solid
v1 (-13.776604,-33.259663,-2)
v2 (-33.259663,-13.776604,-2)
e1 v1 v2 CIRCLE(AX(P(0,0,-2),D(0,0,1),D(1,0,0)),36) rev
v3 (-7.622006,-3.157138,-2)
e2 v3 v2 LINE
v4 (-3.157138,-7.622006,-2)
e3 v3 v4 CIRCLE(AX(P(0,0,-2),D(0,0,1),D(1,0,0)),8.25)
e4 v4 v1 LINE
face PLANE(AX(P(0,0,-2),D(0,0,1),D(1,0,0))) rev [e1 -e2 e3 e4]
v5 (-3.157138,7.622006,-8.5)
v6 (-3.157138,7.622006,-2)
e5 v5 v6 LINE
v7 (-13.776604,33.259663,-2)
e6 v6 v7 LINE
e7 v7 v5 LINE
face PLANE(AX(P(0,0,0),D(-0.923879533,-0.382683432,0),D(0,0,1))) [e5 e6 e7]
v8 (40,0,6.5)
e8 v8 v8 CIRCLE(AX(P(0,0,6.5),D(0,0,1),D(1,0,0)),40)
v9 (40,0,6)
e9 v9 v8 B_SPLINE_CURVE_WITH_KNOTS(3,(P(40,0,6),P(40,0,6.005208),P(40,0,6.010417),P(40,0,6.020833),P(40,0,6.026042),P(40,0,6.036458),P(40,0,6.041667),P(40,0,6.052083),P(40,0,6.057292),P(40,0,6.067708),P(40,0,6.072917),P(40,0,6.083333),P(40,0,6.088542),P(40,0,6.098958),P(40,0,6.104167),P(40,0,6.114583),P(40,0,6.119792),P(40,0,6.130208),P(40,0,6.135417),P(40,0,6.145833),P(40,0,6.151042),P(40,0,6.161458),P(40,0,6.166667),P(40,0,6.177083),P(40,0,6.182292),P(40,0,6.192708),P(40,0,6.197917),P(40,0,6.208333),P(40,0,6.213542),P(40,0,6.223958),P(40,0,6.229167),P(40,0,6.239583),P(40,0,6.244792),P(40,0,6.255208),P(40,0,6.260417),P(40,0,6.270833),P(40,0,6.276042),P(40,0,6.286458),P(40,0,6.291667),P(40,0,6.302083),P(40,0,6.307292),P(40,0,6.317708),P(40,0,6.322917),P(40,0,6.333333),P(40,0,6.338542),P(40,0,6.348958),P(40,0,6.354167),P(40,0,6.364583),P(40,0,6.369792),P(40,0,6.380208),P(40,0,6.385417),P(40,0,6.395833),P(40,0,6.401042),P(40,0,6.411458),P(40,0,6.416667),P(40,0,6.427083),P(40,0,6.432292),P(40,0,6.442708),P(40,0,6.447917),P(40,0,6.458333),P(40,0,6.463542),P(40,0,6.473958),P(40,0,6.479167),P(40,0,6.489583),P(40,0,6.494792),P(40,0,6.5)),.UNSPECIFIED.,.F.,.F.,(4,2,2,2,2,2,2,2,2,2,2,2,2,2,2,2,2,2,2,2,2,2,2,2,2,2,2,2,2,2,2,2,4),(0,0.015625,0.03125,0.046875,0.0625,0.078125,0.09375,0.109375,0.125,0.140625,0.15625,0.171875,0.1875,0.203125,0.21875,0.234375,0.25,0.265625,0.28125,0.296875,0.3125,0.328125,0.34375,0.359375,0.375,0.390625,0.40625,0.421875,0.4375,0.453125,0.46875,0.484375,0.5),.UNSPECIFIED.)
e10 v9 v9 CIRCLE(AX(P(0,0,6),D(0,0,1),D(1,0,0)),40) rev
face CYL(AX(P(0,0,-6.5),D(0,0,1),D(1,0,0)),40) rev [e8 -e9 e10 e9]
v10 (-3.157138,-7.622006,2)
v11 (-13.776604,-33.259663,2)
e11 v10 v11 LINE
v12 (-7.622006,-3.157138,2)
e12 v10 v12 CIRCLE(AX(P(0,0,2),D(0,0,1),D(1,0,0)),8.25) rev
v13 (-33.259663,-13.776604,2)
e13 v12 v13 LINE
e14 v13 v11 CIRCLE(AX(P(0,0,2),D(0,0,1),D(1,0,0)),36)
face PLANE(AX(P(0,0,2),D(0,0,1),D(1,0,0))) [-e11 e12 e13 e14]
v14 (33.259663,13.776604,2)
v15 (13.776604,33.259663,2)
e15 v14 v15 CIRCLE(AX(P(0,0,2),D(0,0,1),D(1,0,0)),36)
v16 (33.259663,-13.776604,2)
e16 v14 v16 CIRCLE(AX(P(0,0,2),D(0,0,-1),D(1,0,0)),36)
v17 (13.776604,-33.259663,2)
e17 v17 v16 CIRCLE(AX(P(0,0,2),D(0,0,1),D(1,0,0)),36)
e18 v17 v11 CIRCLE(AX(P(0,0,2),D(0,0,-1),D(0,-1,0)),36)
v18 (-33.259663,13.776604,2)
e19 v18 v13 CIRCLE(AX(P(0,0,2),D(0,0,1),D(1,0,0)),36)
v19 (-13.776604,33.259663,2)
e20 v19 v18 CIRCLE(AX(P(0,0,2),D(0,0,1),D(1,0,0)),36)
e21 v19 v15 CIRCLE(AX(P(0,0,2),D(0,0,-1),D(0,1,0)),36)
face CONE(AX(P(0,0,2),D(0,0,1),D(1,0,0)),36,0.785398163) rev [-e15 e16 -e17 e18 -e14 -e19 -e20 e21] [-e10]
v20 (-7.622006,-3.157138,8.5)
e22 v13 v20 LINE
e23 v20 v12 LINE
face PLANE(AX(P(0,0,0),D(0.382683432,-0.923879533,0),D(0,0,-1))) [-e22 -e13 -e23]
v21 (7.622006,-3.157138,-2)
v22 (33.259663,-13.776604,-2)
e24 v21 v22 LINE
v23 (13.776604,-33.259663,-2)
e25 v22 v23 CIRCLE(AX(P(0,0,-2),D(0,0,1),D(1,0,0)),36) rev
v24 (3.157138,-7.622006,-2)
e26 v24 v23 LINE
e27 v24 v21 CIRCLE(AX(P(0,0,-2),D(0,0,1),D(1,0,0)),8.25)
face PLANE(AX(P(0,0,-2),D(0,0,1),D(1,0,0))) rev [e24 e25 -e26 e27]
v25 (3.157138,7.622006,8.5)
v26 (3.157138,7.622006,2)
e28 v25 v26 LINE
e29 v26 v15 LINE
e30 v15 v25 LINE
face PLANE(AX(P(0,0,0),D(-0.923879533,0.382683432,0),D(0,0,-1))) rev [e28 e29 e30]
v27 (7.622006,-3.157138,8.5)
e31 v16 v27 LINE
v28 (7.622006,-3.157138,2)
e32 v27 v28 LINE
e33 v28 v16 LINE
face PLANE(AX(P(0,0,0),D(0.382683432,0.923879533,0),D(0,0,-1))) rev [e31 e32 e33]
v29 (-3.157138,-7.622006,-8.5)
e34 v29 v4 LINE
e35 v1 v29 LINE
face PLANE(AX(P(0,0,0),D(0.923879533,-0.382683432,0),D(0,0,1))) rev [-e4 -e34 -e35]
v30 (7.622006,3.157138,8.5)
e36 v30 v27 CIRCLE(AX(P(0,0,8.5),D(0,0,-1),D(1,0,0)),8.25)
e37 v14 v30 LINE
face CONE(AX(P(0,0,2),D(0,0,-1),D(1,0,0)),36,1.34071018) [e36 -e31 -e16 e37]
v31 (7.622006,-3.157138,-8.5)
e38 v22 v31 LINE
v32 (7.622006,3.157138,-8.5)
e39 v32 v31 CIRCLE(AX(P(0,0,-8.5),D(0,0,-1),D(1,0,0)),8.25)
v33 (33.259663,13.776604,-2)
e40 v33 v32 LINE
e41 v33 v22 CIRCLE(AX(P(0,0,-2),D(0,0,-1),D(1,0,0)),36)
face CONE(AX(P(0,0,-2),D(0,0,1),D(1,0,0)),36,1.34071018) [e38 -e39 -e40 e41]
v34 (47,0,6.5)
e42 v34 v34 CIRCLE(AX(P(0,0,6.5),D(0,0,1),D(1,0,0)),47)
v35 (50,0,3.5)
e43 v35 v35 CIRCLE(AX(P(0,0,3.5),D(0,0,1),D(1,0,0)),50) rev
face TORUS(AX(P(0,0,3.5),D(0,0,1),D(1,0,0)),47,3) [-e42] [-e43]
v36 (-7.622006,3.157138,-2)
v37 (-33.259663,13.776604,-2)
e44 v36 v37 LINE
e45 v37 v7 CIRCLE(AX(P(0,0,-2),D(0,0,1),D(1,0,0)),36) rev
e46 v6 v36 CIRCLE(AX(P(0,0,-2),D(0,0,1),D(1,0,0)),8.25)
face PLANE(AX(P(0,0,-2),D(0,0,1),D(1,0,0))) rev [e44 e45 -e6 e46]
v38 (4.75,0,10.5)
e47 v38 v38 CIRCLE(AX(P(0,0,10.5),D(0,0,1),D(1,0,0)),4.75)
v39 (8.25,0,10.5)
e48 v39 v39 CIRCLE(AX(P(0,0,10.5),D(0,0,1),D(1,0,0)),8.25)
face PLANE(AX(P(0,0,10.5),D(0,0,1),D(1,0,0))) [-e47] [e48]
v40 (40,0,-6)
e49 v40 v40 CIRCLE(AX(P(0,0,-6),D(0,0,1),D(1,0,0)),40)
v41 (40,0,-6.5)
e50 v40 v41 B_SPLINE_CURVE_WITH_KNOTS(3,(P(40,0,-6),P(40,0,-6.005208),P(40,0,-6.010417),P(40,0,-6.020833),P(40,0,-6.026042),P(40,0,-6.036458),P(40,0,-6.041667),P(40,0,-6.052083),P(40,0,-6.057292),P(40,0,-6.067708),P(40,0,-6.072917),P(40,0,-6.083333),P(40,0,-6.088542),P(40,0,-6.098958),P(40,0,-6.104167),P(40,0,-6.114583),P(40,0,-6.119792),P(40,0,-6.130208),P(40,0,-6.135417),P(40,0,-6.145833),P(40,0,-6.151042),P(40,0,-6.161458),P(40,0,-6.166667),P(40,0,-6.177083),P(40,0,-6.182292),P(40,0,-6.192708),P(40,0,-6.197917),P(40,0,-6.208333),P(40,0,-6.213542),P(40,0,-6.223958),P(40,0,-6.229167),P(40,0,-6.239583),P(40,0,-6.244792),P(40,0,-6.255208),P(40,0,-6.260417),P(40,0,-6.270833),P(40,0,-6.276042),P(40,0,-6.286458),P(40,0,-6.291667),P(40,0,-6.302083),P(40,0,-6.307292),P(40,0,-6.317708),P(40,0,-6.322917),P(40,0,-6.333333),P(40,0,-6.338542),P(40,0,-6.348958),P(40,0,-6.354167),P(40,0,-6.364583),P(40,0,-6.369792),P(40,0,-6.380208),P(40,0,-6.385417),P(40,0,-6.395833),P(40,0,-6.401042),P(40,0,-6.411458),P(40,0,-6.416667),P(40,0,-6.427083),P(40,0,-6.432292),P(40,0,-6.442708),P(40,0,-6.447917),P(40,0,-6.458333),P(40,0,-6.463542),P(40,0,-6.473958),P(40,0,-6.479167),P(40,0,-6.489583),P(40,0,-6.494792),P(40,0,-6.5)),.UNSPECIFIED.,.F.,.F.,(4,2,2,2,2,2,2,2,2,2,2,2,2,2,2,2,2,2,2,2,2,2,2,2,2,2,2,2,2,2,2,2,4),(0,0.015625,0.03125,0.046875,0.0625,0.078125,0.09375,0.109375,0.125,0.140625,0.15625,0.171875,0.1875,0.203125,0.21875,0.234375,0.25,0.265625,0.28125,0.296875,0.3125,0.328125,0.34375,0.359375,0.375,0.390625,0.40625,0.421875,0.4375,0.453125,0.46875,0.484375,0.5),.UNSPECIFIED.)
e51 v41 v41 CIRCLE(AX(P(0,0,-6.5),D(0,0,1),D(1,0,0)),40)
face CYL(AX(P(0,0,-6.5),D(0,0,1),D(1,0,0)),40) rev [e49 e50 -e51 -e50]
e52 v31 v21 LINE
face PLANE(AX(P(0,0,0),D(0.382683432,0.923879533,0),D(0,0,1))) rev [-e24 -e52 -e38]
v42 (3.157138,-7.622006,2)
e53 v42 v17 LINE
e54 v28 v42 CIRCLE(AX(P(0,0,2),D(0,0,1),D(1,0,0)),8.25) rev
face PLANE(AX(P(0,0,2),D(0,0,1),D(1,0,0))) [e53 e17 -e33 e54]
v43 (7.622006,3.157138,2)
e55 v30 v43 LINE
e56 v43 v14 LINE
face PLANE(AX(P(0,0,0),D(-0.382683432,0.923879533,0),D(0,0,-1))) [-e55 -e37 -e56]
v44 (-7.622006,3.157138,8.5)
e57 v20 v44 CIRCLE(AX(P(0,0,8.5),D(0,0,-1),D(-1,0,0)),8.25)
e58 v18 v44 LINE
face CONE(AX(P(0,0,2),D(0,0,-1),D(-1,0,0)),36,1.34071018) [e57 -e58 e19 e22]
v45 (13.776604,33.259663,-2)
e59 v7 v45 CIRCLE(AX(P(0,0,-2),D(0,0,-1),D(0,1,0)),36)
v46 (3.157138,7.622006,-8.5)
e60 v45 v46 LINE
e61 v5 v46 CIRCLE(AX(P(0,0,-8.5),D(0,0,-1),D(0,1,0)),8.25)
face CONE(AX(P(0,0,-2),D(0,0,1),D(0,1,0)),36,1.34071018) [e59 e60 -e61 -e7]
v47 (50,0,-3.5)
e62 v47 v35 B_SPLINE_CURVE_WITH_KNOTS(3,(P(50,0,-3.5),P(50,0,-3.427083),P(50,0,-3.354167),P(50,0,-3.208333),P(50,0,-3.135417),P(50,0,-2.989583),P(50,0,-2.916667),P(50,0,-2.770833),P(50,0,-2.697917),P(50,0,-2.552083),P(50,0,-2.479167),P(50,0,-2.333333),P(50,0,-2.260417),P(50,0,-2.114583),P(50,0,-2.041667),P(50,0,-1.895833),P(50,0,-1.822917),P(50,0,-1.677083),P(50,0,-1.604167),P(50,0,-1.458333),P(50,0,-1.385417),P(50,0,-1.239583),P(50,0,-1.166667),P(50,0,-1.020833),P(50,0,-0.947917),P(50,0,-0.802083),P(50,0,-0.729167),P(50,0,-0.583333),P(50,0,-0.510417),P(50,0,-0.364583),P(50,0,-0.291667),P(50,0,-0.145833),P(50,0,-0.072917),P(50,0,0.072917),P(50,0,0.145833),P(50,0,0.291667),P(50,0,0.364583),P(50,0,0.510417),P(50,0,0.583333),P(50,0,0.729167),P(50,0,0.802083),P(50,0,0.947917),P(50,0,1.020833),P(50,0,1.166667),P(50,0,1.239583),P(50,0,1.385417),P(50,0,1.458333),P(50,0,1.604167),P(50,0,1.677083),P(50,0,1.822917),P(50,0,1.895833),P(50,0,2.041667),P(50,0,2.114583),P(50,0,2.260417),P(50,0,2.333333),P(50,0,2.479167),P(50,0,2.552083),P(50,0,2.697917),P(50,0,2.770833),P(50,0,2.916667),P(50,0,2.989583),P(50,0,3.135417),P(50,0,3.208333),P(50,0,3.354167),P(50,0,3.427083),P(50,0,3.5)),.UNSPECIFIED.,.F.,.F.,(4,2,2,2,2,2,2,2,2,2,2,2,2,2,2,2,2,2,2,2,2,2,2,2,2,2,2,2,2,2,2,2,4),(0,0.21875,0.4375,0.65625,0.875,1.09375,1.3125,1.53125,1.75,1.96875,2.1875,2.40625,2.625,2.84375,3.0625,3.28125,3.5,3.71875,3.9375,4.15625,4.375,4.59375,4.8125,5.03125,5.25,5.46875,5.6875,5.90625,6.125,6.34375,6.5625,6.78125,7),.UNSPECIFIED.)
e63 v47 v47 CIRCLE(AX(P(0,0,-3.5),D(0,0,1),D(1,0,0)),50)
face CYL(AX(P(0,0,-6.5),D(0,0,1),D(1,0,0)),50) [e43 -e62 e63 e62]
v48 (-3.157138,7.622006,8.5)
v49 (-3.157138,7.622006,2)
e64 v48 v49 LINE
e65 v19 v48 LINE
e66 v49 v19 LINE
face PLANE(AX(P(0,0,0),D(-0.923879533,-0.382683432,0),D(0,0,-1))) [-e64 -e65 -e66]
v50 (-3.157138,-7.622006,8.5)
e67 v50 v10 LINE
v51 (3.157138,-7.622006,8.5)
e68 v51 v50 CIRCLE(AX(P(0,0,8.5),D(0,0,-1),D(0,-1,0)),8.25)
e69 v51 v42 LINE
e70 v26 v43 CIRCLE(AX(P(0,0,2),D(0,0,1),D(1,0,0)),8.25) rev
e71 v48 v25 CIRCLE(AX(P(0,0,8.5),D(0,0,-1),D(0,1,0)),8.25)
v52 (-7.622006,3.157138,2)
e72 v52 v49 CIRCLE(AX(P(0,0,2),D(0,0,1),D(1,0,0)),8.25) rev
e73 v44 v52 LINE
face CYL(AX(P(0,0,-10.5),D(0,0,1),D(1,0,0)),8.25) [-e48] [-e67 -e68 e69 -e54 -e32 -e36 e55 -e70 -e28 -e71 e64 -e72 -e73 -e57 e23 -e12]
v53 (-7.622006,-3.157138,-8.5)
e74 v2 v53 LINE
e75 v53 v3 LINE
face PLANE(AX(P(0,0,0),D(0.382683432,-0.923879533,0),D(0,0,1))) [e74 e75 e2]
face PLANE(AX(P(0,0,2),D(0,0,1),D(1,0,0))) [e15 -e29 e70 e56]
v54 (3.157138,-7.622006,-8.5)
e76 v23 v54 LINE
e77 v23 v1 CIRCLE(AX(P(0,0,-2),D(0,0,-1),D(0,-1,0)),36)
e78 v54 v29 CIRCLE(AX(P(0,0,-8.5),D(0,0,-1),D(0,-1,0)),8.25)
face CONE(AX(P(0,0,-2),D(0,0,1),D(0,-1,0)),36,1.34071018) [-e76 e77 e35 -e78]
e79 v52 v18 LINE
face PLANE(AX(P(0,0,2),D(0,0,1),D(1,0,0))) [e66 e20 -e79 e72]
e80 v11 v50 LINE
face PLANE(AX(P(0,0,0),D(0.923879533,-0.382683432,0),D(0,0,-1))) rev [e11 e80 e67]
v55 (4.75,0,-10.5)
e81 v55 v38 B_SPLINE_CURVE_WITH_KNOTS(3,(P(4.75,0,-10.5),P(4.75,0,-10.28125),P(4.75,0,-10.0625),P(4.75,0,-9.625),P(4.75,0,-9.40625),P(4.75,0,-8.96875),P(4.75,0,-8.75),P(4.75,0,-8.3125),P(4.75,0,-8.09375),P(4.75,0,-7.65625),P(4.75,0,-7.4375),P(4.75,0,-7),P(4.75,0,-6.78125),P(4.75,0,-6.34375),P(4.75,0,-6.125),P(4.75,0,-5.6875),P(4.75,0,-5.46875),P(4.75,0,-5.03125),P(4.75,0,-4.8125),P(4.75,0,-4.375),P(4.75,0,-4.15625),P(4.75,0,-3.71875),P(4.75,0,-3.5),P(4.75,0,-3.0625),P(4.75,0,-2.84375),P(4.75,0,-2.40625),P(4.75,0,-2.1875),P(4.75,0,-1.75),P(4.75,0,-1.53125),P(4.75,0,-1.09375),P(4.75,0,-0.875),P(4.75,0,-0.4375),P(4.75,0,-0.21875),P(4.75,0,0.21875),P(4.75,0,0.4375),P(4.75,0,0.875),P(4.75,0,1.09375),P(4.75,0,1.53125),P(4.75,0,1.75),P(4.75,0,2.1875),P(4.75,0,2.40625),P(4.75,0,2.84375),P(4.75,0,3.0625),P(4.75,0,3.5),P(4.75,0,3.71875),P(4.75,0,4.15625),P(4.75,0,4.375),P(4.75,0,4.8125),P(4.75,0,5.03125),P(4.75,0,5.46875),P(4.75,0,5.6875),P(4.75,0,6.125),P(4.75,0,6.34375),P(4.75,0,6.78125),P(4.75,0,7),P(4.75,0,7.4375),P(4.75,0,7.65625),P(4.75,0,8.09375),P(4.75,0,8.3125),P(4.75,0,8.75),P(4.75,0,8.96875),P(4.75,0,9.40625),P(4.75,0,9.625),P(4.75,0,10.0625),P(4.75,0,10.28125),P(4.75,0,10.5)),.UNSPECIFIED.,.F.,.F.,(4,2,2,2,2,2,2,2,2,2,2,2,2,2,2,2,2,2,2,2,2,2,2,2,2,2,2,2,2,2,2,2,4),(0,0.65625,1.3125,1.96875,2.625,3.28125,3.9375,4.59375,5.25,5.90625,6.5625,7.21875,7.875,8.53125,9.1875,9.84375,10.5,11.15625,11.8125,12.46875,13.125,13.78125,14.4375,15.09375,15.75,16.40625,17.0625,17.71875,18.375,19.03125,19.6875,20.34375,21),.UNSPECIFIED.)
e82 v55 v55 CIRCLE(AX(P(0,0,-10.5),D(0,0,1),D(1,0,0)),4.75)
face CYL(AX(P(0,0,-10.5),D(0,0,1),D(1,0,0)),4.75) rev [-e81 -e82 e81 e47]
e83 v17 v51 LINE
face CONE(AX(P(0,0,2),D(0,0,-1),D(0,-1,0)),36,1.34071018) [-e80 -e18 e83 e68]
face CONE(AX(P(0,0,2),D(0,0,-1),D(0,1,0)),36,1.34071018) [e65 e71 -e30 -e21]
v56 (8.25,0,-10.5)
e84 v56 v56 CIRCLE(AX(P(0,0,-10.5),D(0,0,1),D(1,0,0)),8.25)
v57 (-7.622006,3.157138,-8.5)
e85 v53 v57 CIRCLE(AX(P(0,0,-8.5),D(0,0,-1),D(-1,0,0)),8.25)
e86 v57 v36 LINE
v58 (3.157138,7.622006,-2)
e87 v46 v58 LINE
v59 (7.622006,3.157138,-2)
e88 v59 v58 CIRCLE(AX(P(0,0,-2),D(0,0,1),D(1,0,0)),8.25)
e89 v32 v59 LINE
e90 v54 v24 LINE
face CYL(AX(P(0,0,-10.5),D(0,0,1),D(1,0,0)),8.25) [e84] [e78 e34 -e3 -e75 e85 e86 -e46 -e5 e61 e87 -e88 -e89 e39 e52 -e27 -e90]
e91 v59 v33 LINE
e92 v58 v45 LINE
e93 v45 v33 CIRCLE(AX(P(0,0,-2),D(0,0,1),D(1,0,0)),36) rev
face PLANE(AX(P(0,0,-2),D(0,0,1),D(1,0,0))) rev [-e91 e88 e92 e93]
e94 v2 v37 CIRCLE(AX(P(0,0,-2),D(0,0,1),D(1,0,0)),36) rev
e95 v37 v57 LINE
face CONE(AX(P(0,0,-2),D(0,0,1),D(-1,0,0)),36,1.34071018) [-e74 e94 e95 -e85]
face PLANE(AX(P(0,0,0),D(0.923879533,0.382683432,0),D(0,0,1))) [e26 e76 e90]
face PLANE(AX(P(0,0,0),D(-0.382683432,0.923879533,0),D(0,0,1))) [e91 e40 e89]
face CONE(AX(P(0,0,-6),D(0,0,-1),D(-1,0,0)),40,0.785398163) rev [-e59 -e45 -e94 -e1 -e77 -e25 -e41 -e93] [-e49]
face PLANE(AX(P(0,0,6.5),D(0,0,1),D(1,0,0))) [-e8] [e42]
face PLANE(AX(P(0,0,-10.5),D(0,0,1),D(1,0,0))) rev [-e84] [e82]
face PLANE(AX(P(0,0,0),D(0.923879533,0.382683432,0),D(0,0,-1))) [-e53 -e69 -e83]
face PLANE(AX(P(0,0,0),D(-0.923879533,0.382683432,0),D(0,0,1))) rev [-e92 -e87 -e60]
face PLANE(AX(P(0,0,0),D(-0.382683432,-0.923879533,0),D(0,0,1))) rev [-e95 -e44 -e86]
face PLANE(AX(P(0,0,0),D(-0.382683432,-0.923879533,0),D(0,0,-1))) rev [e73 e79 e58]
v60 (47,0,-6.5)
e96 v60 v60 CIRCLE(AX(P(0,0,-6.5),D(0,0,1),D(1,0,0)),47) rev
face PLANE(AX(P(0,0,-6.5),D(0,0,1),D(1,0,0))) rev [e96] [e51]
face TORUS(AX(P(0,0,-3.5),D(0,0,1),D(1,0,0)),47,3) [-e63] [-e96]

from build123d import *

# Parameters (mm, degrees)
BOSS_EXTRUDE1_DEPTH      = 10.5
BOSS_EXTRUDE1_DEPTH_BACK = 10.5
SKETCH1_R                = 8.25
SKETCH1_R_2              = 4.75
BOSS_EXTRUDE2_DEPTH      = 6.5
BOSS_EXTRUDE2_DEPTH_BACK = 6.5
SKETCH2_R                = 50
SKETCH2_R_2              = 40
BOSS_EXTRUDE3_DEPTH      = 2
BOSS_EXTRUDE3_DEPTH_BACK = 2
SKETCH3_R                = 40
SKETCH3_R_2              = 8.25
CHAMFER1_SIZE            = 4
FILLET1_R                = 3
REVOLVE1_ANGLE           = 45
CIRPATTERN1_COUNT        = 4
MIRROR1_COPY_1_ANGLE     = 45
MIRROR1_COPY_2_ANGLE     = 45
MIRROR1_COPY_3_ANGLE     = 45


# Read off the part's stored shape, not the designer's step: Revolve1
with BuildPart() as part:
    # Sketch1 → Boss-Extrude1 (new, two sides: drawn at the far end of the back side and taken through both)
    with BuildSketch(Plane.XY.offset(-BOSS_EXTRUDE1_DEPTH_BACK)):
        Circle(SKETCH1_R)
        Circle(SKETCH1_R_2, mode=Mode.SUBTRACT)
    extrude(amount=BOSS_EXTRUDE1_DEPTH + BOSS_EXTRUDE1_DEPTH_BACK)



with BuildPart() as body_2:
    # Sketch2 → Boss-Extrude2 (new, two sides: drawn at the far end of the back side and taken through both)
    with BuildSketch(Plane.XY.offset(-BOSS_EXTRUDE2_DEPTH_BACK)):
        Circle(SKETCH2_R)
        Circle(SKETCH2_R_2, mode=Mode.SUBTRACT)
    extrude(amount=BOSS_EXTRUDE2_DEPTH + BOSS_EXTRUDE2_DEPTH_BACK)


with BuildPart() as part_1:
    add(part.part)

    add(body_2.part)  # Boss-Extrude3 merges body 2
    # Sketch3 → Boss-Extrude3 (add, two sides: drawn at the far end of the back side and taken through both)
    with BuildSketch(Plane.XY.offset(-BOSS_EXTRUDE3_DEPTH_BACK)):
        Circle(SKETCH3_R)
        Circle(SKETCH3_R_2, mode=Mode.SUBTRACT)
    extrude(amount=BOSS_EXTRUDE3_DEPTH + BOSS_EXTRUDE3_DEPTH_BACK)

    # Chamfer1
    chamfer1_edges = [part_1.edges().sort_by_distance(p)[0] for p in [
        (-40, 0, -2),
        (-40, 0, 2),
    ]]
    chamfer(chamfer1_edges, length=CHAMFER1_SIZE)

    # Fillet1
    fillet1_edges = [part_1.edges().sort_by_distance(p)[0] for p in [
        (-50, 0, -6.5),
        (-50, 0, 6.5),
    ]]
    fillet(fillet1_edges, radius=FILLET1_R)

    # Revolve1 outline → Revolve1 (revolve)
    with BuildSketch(Plane(origin=(0, 0, 0), x_dir=(-0.9238795325112862, 0.3826834323650911, 0), z_dir=(0.3826834323650911, 0.9238795325112862, 0))):
        Polygon((36, 2), (8.25, 8.5), (8.25, 2), align=None)
    revolve1 = revolve(axis=Axis((0, 0, 0), (0, 0, 1)), revolution_arc=REVOLVE1_ANGLE)

    # CirPattern1: Revolve1 ×4 about axis
    cirpattern1_axis = Axis((0, 0, -10.5), (0, 0, 1))
    for i in range(1, CIRPATTERN1_COUNT):
        add(revolve1.rotate(cirpattern1_axis, i * 360 / CIRPATTERN1_COUNT))

    # Mirror1: Revolve1 across plane
    add(revolve1.mirror(Plane.XY))

    # Mirror1 copy 1 sketch → Mirror1 copy 1 (revolve)
    with BuildSketch(Plane(origin=(0, 0, 0), x_dir=(-0.38268343236509117, -0.9238795325112862, 0), z_dir=(-0.9238795325112862, 0.38268343236509117, 0))):
        Polygon((36, -2), (8.25, -8.5), (8.25, -2), align=None)
    revolve(axis=Axis((0, 0, 0), (0, 0, 1)), revolution_arc=MIRROR1_COPY_1_ANGLE)

    # Mirror1 copy 2 sketch → Mirror1 copy 2 (revolve)
    with BuildSketch(Plane(origin=(0, 0, 0), x_dir=(0.9238795325112862, -0.3826834323650912, 0), z_dir=(-0.3826834323650912, -0.9238795325112862, 0))):
        Polygon((36, -2), (8.25, -8.5), (8.25, -2), align=None)
    revolve(axis=Axis((0, 0, 0), (0, 0, 1)), revolution_arc=MIRROR1_COPY_2_ANGLE)

    # Mirror1 copy 3 sketch → Mirror1 copy 3 (revolve)
    with BuildSketch(Plane(origin=(0, 0, 0), x_dir=(0.3826834323650913, 0.9238795325112861, 0), z_dir=(0.9238795325112861, -0.3826834323650913, 0))):
        Polygon((36, -2), (8.25, -8.5), (8.25, -2), align=None)
    revolve(axis=Axis((0, 0, 0), (0, 0, 1)), revolution_arc=MIRROR1_COPY_3_ANGLE)


solid = part_1.part
